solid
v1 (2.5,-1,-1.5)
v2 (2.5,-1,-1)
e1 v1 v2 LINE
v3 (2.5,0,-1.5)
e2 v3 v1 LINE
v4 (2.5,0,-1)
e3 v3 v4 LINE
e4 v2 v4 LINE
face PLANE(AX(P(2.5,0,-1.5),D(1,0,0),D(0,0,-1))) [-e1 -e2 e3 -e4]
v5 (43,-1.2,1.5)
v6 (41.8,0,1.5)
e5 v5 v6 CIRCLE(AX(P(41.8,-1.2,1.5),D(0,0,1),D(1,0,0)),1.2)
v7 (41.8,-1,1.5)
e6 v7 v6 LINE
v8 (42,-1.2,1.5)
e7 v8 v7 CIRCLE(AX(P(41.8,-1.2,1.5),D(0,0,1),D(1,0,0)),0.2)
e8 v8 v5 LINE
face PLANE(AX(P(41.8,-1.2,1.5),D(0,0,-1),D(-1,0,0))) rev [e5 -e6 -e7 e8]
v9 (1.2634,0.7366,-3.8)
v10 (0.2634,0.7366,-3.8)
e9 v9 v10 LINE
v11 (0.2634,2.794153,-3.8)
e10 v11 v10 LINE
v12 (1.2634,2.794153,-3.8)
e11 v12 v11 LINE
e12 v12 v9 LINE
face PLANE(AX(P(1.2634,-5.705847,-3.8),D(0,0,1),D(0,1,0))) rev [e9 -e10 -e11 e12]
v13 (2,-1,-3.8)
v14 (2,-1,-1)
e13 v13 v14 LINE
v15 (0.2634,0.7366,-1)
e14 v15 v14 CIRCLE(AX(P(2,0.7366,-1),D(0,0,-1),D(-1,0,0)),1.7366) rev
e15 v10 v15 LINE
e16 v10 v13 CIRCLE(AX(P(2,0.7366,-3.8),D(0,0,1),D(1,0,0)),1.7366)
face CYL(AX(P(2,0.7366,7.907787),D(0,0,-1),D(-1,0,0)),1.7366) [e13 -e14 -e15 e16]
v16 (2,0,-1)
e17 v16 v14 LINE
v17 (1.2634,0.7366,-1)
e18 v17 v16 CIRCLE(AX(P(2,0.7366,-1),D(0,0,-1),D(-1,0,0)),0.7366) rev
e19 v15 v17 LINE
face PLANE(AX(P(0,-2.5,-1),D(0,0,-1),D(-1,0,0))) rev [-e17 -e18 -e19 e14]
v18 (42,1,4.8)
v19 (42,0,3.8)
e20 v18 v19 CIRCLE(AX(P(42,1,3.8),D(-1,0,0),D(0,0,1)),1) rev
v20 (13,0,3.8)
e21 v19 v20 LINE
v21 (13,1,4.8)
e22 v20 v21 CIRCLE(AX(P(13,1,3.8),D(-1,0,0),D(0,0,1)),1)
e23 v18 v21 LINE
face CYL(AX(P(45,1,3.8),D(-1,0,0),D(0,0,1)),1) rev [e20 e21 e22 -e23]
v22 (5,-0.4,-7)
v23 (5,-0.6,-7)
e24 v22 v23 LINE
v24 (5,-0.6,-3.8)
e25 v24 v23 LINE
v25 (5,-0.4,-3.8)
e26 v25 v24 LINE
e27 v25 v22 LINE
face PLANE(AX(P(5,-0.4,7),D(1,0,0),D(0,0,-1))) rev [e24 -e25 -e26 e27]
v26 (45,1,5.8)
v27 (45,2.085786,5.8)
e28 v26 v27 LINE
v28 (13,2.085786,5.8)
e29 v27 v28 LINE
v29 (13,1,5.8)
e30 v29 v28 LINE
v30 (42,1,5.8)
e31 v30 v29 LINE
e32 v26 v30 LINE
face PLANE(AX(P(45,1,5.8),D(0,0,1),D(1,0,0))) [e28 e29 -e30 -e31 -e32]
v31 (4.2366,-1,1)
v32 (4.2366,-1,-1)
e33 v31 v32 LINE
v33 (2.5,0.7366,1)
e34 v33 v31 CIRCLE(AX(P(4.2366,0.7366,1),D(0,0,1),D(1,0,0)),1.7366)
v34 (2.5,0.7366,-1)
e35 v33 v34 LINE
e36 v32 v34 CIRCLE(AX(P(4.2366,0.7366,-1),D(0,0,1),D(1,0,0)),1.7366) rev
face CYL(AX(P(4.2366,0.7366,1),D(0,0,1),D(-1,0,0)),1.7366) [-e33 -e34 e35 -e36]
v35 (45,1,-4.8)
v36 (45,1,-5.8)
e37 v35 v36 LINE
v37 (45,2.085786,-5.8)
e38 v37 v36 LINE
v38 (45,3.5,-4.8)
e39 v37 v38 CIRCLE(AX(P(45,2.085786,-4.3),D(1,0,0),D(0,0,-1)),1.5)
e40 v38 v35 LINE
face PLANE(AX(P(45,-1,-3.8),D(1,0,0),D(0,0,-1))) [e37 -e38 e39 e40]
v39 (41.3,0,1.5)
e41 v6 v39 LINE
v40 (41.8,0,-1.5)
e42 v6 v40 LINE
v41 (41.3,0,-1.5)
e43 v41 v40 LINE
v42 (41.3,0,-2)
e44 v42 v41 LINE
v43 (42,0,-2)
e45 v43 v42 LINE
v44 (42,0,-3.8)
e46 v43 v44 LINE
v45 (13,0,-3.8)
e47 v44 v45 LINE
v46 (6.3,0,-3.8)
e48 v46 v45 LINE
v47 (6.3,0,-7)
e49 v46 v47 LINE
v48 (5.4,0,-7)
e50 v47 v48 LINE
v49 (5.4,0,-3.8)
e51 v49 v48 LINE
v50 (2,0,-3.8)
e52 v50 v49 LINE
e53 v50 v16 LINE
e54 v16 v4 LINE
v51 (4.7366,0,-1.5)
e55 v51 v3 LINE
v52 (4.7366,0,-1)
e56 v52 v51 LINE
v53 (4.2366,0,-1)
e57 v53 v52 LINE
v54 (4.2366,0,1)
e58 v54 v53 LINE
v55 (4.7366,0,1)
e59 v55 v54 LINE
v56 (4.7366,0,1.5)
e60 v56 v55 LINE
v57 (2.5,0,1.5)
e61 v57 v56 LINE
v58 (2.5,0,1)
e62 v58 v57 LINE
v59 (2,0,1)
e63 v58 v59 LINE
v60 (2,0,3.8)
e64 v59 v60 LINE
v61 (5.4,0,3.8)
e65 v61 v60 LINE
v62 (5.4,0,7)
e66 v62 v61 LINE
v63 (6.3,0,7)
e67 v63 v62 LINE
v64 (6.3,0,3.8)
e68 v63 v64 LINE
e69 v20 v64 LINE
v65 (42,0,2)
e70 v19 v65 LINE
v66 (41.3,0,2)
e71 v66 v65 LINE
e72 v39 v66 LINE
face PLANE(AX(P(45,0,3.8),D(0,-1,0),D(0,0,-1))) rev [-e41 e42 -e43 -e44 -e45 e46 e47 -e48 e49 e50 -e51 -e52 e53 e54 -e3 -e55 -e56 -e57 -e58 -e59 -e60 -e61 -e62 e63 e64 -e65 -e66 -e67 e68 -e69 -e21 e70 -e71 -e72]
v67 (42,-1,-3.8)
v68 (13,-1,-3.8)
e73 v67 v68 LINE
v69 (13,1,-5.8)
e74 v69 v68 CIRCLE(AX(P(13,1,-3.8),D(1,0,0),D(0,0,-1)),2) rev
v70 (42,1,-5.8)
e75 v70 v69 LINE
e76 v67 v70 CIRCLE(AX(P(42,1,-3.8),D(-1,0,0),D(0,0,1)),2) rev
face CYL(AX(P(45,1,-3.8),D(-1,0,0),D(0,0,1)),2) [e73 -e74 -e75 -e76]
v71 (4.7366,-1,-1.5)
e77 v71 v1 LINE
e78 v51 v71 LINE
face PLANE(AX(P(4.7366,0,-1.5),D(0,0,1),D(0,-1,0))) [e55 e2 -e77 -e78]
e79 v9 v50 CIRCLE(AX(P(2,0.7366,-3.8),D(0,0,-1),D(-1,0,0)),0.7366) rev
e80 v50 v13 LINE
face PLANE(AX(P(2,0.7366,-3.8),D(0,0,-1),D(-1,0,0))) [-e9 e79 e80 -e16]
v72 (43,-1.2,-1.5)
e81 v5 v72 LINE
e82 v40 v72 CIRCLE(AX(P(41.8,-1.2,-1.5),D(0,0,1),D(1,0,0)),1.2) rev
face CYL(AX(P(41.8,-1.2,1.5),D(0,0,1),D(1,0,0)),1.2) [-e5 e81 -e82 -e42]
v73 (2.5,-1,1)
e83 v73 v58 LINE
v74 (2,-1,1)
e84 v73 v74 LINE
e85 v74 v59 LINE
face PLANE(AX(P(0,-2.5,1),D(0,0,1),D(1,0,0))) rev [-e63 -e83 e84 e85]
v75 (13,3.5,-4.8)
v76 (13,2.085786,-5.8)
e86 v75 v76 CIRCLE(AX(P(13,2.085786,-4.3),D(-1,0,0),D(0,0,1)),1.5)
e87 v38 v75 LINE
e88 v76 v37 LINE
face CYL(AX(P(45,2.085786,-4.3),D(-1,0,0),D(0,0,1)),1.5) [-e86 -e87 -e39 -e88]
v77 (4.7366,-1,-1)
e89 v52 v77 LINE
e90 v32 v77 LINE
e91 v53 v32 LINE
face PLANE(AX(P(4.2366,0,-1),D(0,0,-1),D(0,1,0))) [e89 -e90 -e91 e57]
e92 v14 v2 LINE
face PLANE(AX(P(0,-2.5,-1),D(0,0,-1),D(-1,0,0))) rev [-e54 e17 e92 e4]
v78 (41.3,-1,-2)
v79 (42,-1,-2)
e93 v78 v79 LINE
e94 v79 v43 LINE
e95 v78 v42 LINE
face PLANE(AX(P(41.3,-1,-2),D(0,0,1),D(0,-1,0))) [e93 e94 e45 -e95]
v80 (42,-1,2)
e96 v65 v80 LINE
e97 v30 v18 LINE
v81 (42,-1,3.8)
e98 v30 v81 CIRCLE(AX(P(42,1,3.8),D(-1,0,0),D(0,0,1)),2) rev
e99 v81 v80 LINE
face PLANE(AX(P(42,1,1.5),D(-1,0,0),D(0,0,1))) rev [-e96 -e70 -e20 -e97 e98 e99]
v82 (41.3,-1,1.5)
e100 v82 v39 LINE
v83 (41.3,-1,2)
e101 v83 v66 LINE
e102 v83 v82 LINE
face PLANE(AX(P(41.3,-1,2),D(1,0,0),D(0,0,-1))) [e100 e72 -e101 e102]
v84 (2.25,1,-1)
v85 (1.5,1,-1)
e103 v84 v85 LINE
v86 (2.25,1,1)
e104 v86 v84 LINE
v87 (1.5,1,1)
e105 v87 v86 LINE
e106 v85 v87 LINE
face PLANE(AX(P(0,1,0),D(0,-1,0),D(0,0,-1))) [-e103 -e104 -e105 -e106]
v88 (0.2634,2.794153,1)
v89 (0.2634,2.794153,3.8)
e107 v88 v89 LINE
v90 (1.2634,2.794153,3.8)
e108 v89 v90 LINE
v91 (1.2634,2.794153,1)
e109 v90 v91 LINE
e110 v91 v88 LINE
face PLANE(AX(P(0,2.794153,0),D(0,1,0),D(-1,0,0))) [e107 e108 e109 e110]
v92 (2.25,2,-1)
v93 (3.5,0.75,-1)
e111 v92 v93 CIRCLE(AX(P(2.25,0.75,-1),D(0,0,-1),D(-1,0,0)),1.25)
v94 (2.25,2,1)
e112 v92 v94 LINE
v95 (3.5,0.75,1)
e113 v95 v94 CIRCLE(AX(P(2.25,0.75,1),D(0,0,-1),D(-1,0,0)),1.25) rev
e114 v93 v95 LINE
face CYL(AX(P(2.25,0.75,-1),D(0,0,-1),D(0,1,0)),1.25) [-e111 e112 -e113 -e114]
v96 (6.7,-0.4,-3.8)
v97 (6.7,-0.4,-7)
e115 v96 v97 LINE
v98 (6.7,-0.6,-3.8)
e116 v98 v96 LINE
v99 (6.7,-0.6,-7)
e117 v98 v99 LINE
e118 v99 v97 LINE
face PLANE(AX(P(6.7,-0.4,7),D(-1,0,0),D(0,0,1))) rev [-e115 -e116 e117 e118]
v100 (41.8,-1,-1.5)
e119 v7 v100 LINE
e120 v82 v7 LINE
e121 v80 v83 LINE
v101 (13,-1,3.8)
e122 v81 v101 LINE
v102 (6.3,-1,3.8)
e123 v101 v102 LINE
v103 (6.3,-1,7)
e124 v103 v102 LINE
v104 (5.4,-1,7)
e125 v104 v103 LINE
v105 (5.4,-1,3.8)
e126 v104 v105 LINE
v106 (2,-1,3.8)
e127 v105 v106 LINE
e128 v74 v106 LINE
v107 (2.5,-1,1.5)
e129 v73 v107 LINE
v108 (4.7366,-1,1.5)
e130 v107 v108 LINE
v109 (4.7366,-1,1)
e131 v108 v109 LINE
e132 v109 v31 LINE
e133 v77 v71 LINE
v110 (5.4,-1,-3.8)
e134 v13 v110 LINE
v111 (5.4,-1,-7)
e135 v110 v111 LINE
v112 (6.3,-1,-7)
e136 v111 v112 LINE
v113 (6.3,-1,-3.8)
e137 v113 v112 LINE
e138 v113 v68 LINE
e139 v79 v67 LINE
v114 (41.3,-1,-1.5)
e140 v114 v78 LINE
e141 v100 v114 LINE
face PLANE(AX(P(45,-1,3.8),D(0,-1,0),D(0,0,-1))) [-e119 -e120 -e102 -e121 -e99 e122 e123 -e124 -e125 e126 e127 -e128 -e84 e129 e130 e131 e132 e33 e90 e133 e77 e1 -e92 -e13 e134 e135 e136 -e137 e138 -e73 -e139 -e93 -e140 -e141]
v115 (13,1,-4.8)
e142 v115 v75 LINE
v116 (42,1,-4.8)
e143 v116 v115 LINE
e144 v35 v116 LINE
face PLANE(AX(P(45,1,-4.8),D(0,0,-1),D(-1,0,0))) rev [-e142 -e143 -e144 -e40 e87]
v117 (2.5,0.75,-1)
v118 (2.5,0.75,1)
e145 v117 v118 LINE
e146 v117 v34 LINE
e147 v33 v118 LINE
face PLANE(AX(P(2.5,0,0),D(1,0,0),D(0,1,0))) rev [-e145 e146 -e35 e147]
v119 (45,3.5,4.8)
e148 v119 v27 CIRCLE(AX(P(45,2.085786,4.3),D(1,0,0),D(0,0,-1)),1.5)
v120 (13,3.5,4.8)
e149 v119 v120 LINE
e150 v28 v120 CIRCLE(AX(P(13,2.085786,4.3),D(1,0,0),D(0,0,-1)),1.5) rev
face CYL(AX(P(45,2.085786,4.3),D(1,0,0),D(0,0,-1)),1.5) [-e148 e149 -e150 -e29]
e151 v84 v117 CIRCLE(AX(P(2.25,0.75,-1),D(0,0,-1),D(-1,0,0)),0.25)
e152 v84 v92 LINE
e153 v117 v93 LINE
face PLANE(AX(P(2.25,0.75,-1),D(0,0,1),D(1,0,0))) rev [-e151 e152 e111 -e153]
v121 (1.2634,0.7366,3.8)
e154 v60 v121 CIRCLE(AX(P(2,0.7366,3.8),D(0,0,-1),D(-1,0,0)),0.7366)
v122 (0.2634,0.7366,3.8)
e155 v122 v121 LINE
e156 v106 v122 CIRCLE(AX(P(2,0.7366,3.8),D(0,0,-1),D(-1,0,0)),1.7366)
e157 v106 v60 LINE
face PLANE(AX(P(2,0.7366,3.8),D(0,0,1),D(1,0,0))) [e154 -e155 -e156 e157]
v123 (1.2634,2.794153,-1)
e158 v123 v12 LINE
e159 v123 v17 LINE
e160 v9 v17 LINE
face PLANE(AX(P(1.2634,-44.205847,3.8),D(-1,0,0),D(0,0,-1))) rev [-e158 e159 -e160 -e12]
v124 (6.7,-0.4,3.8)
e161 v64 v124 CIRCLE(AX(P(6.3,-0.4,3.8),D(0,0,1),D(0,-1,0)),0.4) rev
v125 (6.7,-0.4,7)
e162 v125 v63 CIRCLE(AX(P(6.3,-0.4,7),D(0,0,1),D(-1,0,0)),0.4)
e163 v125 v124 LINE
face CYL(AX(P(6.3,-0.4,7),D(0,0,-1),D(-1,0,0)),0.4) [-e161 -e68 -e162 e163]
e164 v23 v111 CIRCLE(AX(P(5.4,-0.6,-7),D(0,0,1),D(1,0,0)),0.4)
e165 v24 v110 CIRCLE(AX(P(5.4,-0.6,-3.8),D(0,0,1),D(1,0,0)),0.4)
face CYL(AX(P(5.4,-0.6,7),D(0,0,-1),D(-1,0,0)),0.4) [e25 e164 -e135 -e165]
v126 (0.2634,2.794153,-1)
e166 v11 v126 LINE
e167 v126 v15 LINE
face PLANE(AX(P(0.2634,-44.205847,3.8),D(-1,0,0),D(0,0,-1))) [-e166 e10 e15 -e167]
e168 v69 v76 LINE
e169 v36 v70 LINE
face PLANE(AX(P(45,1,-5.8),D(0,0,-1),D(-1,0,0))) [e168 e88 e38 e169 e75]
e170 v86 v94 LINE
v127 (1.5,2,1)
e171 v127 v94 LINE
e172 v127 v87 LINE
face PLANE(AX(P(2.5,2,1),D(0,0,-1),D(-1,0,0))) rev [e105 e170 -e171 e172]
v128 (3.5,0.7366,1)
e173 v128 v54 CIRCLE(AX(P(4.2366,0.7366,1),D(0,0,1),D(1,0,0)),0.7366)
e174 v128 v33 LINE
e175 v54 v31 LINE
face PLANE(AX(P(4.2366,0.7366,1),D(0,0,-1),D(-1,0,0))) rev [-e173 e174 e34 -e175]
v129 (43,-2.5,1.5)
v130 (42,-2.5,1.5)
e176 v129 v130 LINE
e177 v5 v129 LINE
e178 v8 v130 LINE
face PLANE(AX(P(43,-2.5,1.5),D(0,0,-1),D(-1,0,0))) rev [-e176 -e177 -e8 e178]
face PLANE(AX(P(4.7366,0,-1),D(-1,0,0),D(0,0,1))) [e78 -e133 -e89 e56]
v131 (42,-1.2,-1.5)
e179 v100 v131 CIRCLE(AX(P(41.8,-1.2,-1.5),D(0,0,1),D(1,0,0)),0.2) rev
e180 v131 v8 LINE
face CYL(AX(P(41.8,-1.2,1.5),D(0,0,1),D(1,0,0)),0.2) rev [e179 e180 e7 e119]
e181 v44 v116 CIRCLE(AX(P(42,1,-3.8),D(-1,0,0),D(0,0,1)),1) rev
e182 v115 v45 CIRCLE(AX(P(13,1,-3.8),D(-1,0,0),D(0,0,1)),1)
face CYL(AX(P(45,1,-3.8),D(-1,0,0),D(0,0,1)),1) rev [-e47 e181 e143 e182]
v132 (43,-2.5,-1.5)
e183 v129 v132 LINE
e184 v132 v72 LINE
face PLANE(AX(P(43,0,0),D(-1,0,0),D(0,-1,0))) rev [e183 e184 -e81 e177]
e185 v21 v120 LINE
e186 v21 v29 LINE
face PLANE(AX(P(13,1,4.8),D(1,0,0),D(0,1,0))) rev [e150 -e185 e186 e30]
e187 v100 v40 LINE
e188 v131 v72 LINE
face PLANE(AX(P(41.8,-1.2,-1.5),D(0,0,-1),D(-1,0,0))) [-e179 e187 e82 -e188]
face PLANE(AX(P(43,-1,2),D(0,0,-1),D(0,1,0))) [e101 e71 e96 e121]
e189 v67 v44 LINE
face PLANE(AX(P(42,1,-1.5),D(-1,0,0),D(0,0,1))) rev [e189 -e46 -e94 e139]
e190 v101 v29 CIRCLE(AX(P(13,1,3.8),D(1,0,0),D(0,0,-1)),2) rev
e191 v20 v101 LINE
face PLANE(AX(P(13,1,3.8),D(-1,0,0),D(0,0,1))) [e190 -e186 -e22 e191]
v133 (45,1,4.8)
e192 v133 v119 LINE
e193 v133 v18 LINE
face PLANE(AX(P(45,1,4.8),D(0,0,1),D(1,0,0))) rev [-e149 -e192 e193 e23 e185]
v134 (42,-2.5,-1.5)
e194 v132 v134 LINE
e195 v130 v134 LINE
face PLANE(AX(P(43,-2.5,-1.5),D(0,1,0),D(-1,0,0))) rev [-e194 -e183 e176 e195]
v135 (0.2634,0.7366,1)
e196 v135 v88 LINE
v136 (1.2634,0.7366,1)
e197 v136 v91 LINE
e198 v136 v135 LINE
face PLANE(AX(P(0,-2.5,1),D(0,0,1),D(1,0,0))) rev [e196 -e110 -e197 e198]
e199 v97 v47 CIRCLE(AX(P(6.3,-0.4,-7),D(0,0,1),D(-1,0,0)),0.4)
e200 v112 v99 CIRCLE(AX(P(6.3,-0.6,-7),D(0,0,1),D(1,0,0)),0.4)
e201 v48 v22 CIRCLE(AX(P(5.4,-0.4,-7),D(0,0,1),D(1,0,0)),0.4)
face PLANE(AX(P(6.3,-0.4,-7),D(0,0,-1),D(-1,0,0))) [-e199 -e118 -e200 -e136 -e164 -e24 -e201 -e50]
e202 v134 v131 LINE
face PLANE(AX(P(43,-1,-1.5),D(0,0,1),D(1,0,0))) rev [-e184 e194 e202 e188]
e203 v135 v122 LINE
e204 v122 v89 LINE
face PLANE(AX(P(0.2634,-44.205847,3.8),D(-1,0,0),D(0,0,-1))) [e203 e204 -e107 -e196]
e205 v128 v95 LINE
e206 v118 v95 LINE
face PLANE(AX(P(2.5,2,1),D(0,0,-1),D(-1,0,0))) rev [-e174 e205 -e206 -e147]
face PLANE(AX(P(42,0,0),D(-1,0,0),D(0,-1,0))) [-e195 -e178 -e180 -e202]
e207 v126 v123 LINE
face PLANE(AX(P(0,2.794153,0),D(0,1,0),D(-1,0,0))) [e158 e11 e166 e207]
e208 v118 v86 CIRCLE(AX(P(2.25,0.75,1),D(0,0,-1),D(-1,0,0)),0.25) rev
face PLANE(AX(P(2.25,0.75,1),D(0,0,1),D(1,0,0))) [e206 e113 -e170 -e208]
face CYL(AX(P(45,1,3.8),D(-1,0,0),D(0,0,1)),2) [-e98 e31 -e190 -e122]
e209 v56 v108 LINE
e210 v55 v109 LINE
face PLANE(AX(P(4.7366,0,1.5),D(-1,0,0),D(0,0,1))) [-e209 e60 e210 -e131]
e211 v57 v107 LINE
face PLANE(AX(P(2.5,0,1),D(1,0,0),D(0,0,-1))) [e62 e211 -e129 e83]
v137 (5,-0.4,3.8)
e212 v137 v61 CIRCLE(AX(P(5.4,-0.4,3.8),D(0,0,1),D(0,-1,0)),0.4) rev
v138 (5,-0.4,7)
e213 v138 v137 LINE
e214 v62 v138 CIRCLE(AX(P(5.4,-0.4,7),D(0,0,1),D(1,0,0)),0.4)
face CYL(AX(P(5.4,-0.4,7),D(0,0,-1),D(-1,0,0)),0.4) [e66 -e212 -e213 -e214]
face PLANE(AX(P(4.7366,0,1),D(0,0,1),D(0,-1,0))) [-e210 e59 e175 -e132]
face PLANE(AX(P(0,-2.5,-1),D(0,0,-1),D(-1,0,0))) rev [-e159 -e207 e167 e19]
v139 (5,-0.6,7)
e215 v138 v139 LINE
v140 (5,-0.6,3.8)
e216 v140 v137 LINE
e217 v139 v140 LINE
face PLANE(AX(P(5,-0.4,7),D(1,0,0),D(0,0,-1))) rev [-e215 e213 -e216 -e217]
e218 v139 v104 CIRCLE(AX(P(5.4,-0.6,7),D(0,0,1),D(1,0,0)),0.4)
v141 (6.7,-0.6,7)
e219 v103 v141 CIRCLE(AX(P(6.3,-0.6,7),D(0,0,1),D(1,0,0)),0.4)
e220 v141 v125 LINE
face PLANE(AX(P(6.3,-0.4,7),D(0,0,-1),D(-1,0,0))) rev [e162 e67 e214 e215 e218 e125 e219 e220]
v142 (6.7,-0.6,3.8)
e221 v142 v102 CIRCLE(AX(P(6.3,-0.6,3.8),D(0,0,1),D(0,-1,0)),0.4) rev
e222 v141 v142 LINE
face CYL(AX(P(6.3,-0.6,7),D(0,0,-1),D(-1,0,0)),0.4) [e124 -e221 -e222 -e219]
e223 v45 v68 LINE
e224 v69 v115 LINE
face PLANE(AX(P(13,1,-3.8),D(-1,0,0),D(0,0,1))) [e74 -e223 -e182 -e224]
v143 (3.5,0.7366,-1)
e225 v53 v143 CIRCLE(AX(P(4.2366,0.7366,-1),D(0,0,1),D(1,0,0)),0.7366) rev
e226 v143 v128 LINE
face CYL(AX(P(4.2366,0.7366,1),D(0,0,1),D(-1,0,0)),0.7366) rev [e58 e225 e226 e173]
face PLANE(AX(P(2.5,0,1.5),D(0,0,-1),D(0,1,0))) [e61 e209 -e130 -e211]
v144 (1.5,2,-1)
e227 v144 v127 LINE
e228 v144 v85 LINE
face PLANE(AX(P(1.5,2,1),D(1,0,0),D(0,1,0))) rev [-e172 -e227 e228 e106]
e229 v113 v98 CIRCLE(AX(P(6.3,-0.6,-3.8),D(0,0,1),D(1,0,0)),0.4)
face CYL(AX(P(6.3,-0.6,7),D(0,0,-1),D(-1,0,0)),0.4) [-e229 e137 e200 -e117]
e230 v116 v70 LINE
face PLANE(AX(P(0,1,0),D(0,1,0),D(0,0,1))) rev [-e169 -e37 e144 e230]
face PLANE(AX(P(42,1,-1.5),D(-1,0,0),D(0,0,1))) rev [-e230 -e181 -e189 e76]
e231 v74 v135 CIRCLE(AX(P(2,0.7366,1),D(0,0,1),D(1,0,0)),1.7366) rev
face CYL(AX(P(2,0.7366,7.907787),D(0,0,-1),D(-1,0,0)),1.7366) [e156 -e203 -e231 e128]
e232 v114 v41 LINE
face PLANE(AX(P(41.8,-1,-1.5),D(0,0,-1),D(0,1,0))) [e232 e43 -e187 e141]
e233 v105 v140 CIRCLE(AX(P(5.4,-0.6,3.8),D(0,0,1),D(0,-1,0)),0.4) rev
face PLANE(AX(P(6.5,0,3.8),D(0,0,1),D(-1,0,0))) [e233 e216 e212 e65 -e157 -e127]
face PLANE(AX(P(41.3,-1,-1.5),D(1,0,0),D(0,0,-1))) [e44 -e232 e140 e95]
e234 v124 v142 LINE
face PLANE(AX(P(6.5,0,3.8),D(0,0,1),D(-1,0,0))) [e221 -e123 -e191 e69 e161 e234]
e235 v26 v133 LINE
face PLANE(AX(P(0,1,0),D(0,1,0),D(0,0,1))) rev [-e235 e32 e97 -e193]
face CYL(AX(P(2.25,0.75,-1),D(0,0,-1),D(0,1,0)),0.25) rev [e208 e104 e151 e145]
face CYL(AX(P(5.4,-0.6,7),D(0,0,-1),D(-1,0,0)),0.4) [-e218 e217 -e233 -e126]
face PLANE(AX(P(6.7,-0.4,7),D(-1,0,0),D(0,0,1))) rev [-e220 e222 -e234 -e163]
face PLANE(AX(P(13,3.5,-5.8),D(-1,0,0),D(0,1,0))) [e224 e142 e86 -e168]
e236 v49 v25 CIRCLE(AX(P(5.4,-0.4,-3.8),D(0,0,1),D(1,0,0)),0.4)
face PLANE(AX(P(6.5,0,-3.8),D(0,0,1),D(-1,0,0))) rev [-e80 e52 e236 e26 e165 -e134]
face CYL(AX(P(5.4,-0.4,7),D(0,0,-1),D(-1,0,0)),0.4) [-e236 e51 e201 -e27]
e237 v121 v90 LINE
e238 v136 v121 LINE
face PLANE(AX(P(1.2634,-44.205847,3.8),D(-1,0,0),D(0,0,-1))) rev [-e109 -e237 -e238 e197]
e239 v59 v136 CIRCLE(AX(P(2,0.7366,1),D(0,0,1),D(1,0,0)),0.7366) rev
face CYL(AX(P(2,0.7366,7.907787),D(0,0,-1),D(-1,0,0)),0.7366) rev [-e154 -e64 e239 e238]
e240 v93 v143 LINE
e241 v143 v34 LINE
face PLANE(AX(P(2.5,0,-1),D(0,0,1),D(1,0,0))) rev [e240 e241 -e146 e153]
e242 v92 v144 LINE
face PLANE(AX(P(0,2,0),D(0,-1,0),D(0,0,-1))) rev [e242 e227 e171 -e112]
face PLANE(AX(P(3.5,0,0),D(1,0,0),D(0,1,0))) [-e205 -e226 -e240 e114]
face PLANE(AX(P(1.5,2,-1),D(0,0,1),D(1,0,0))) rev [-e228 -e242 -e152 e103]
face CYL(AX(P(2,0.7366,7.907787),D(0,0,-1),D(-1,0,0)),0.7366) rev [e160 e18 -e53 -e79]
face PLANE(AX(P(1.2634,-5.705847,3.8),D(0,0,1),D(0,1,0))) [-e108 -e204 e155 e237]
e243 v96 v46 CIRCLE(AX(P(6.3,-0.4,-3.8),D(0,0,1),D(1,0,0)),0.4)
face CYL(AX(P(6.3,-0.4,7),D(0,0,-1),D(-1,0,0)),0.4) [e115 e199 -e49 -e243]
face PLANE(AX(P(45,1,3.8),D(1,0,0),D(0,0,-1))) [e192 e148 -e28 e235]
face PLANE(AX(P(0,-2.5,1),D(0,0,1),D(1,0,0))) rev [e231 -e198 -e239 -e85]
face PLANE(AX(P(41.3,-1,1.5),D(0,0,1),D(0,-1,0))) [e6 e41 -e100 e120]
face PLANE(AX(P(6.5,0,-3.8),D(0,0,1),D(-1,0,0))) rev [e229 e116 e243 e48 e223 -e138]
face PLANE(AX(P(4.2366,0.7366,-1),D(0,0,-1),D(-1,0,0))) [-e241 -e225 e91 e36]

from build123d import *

# Parameters (mm, degrees)
BASE_FLANGE2_DEPTH              = 45
FRONT_CUT_DEPTH                 = 2
FRONT_STRIP_W                   = 4.4
FRONT_STRIP_H                   = 1
FRONT_STRIP_CUT_DEPTH           = 3
FRONT_RELIEF_W                  = 4.9
FRONT_RELIEF_H                  = 0.5
FRONT_RELIEF_CUT_DEPTH          = 1
FRONT_DEPTH                     = 3
BACK_CUT_DEPTH                  = 13
GUIDING_PINS_DEPTH              = 7
FILLET3_R                       = 1.5
BACK_START                      = -3.8
BACK_2_BENDS_DEPTH              = 7.6
BACK_2_BENDS_2_DEPTH            = 7.6
MIDDLE_CUT_DEPTH                = 46.675485766
MIDDLE_CUT_DEPTH_BACK           = 46.675485766
SKETCH32_W                      = 2.5
SKETCH32_H                      = 2
MIDDLE_START                    = -1.5
MIDDLE_SPRING_1_DEPTH           = 3
MIDDLE_SPRING_1_2_DEPTH         = 0.5
MIDDLE_START_2                  = 1
MIDDLE_SPRING_1_3_DEPTH         = 0.5
MIDDLE_START_3                  = -1
MIDDLE_SPRING_1_4_DEPTH         = 2
MIDDLE_SPRING_2_STRIP_W         = 4.5
MIDDLE_SPRING_2_STRIP_H         = 1
MIDDLE_SPRING_2_STRIP_CUT_DEPTH = 2
MIDDLE_SPRING_2_DEPTH           = 2
SKETCH50_W                      = 1
SKETCH50_H                      = 2.8
BACK_2_BENDS_EXTENSION_DEPTH    = 2


# Read off the part's stored shape, not the designer's step: back cut, back 2 bends, middle spring 1
# Sheet-metal steps are written as plain solids
with BuildPart() as part:
    # Sketch6 → Base-Flange2 (new body)
    with BuildSketch(Plane(origin=(0, 0, 0), x_dir=(0, 0, -1), z_dir=(1, 0, 0))):
        with BuildLine():
            Line((-4.8, 3.5), (-4.8, 1))
            ThreePointArc((-4.8, 1), (-4.507106781, 0.292893219), (-3.8, 0))
            Line((-3.8, 0), (3.8, 0))
            ThreePointArc((3.8, 0), (4.507106781, 0.292893219), (4.8, 1))
            Line((4.8, 1), (4.8, 3.5))
            Line((4.8, 3.5), (5.8, 3.5))
            Line((5.8, 3.5), (5.8, 1))
            ThreePointArc((5.8, 1), (5.214213562, -0.414213562), (3.8, -1))
            Line((3.8, -1), (-3.8, -1))
            ThreePointArc((-3.8, -1), (-5.214213562, -0.414213562), (-5.8, 1))
            Line((-5.8, 1), (-5.8, 3.5))
            Line((-5.8, 3.5), (-4.8, 3.5))
        make_face()
    extrude(amount=BASE_FLANGE2_DEPTH)

    # Sketch51 → front cut (cut)
    with BuildSketch(Plane.XZ.offset(1)):
        Polygon((42, 1.5), (43, 1.5), (43, -1.5), (42, -1.5), (42, -6), (46, -6), (46, -1.5), (45, -1.5), (45, 1.5), (46, 1.5), (46, 6), (42, 6), align=None)
    extrude(amount=-FRONT_CUT_DEPTH, mode=Mode.SUBTRACT)

    # front strip (across the edge) → front strip cut (cut)
    with BuildSketch(Plane(origin=(43, -1, -1.5), x_dir=(-1, 0, 0), z_dir=(0, 0, 1))):
        with Locations((-1, -0.5)):
            Rectangle(FRONT_STRIP_W, FRONT_STRIP_H)
    extrude(amount=FRONT_STRIP_CUT_DEPTH, mode=Mode.SUBTRACT)

    # front relief (on the sheet) → front relief cut (cut)
    with BuildSketch(Plane(origin=(41.8, -1, -1.5), x_dir=(-1, 0, 0), z_dir=(0, -1, 0))):
        with Locations((-1.95, 0.25)):
            Rectangle(FRONT_RELIEF_W, FRONT_RELIEF_H)
        with Locations((-1.95, -3.25)):
            Rectangle(FRONT_RELIEF_W, FRONT_RELIEF_H)
    extrude(amount=-FRONT_RELIEF_CUT_DEPTH, mode=Mode.SUBTRACT)

    # front section (across the edge) → front (add)
    with BuildSketch(Plane(origin=(43, -1, -1.5), x_dir=(-1, 0, 0), z_dir=(0, 0, 1))):
        with BuildLine():
            Line((0, 0.2), (0, 1.5))
            Line((0, 1.5), (1, 1.5))
            Line((1, 1.5), (1, 0.2))
            ThreePointArc((1, 0.2), (1.058578644, 0.058578644), (1.2, 0))
            Line((1.2, 0), (1.2, -1))
            ThreePointArc((1.2, -1), (0.351471863, -0.648528137), (0, 0.2))
        make_face()
    extrude(amount=FRONT_DEPTH)

    # back cut outline → back cut (cut)
    with BuildSketch(Plane.YZ):
        with BuildLine():
            Line((-1, 3.8), (0, 3.8))
            ThreePointArc((0, 3.8), (0.292893219, 4.507106781), (1, 4.8))
            Line((1, 4.8), (3.5, 4.8))
            Line((3.5, 4.8), (3.5, 5.8))
            Line((3.5, 5.8), (1, 5.8))
            ThreePointArc((1, 5.8), (-0.414213562, 5.214213562), (-1, 3.8))
        make_face()
        with BuildLine():
            ThreePointArc((1, -4.8), (0.292893219, -4.507106781), (0, -3.8))
            Line((0, -3.8), (-1, -3.8))
            ThreePointArc((-1, -3.8), (-0.414213562, -5.214213562), (1, -5.8))
            Line((1, -5.8), (3.5, -5.8))
            Line((3.5, -5.8), (3.5, -4.8))
            Line((3.5, -4.8), (1, -4.8))
        make_face()
    extrude(amount=BACK_CUT_DEPTH, mode=Mode.SUBTRACT)

    # Sketch27 → guiding pins (add, symmetric)
    with BuildSketch(Plane.XY):
        with BuildLine():
            Line((5.4, 0), (6.3, 0))
            ThreePointArc((6.3, 0), (6.582842712, -0.117157288), (6.7, -0.4))
            Line((6.7, -0.4), (6.7, -0.6))
            ThreePointArc((6.7, -0.6), (6.582842712, -0.882842712), (6.3, -1))
            Line((6.3, -1), (5.4, -1))
            ThreePointArc((5.4, -1), (5.117157288, -0.882842712), (5, -0.6))
            Line((5, -0.6), (5, -0.4))
            ThreePointArc((5, -0.4), (5.117157288, -0.117157288), (5.4, 0))
        make_face()
    extrude(amount=GUIDING_PINS_DEPTH, both=True)

    # Fillet3
    # the kernel refuses this fillet: 1.5 mm, written as the material it takes off along each edge
    with BuildSketch(Plane(origin=(9.464466094, 3.5, 5.8), x_dir=(0, -1, 0), z_dir=(1, 0, 0))) as fillet3_piece_1:
        with BuildLine():
            CenterArc((1.414213562, 1.5), FILLET3_R, 199.471220634, 70.528779366)
            Line((0, 1), (-0.028284271, 0.99))
            ThreePointArc((-0.028284271, 0.99), (-0.03, 0.5), (-0.03, 0))
            Line((-0.03, 0), (0, -0.03))
            Line((0, -0.03), (1.414213562, -0.03))
            Line((1.414213562, -0.03), (1.414213562, 0))
        make_face()
    extrude(amount=39.071067812, mode=Mode.SUBTRACT)
    with BuildSketch(Plane(origin=(9.464466094, 3.5, -5.8), x_dir=(0, -1, 0), z_dir=(1, 0, 0))) as fillet3_piece_2:
        with BuildLine():
            CenterArc((1.414213562, -1.5), FILLET3_R, 90, 70.528779366)
            Line((0, -1), (-0.028284271, -0.99))
            ThreePointArc((-0.028284271, -0.99), (-0.03, -0.5), (-0.03, 0))
            Line((-0.03, 0), (0, 0.03))
            Line((0, 0.03), (1.414213562, 0.03))
            Line((1.414213562, 0.03), (1.414213562, 0))
        make_face()
    extrude(amount=39.071067812, mode=Mode.SUBTRACT)

    # back 2 bends outline → back 2 bends (cut)
    with BuildSketch(Plane.XY.offset(BACK_START)):
        with BuildLine():
            Line((0, -1), (2, -1))
            ThreePointArc((2, -1), (1.068173836, -0.728828115), (0.42735891, 0))
            Line((0.42735891, 0), (0, 0))
            Line((0, 0), (0, -1))
        make_face()
    extrude(amount=BACK_2_BENDS_DEPTH, mode=Mode.SUBTRACT)

    # back 2 bends 2 outline → back 2 bends 2 (add)
    with BuildSketch(Plane.XY.offset(BACK_START)):
        with BuildLine():
            ThreePointArc((0.2634, 0.7366), (0.304885243, 0.359286442), (0.42735891, 0))
            Line((0.42735891, 0), (2, 0))
            ThreePointArc((2, 0), (1.479145145, 0.215745145), (1.2634, 0.7366))
            Line((1.2634, 0.7366), (1.2634, 0.794153262))
            Line((1.2634, 0.794153262), (0.2634, 0.794153262))
            Line((0.2634, 0.794153262), (0.2634, 0.7366))
        make_face()
    extrude(amount=BACK_2_BENDS_2_DEPTH)

    # Sketch32 → middle cut (cut, two sides: drawn at the far end of the back side and taken through both)
    with BuildSketch(Plane(origin=(0, 0, 0), x_dir=(1, 0, 0), z_dir=(0, 1, 0)).offset(-MIDDLE_CUT_DEPTH_BACK)):
        with Locations((1.25, 0)):
            Rectangle(SKETCH32_W, SKETCH32_H)
    extrude(amount=MIDDLE_CUT_DEPTH + MIDDLE_CUT_DEPTH_BACK, mode=Mode.SUBTRACT)

    # middle spring 1 outline → middle spring 1 (cut)
    with BuildSketch(Plane.XY.offset(MIDDLE_START)):
        with BuildLine():
            Line((2.5, 0), (2.5, -1))
            Line((2.5, -1), (4.2366, -1))
            ThreePointArc((4.2366, -1), (3.304773836, -0.728828115), (2.66395891, 0))
            Line((2.66395891, 0), (2.5, 0))
        make_face()
    extrude(amount=MIDDLE_SPRING_1_DEPTH, mode=Mode.SUBTRACT)

    # middle spring 1 2 outline → middle spring 1 2 (cut)
    with BuildSketch(Plane.XY.offset(MIDDLE_START)):
        with BuildLine():
            ThreePointArc((2.66395891, 0), (3.304773836, -0.728828115), (4.2366, -1))
            Line((4.2366, -1), (4.7366, -1))
            Line((4.7366, -1), (4.7366, 0))
            Line((4.7366, 0), (2.66395891, 0))
        make_face()
    extrude(amount=MIDDLE_SPRING_1_2_DEPTH, mode=Mode.SUBTRACT)

    # middle spring 1 3 outline → middle spring 1 3 (cut)
    with BuildSketch(Plane.XY.offset(MIDDLE_START_2)):
        with BuildLine():
            ThreePointArc((2.66395891, 0), (3.304773836, -0.728828115), (4.2366, -1))
            Line((4.2366, -1), (4.7366, -1))
            Line((4.7366, -1), (4.7366, 0))
            Line((4.7366, 0), (2.66395891, 0))
        make_face()
    extrude(amount=MIDDLE_SPRING_1_3_DEPTH, mode=Mode.SUBTRACT)

    # middle spring 1 4 outline → middle spring 1 4 (add)
    with BuildSketch(Plane.XY.offset(MIDDLE_START_3)):
        with BuildLine():
            ThreePointArc((2.5, 0.7366), (2.541485243, 0.359286442), (2.66395891, 0))
            Line((2.66395891, 0), (4.2366, 0))
            ThreePointArc((4.2366, 0), (3.715745145, 0.215745145), (3.5, 0.7366))
            Line((3.5, 0.7366), (3.5, 2))
            Line((3.5, 2), (2.5, 2))
            Line((2.5, 2), (2.5, 0.7366))
        make_face()
    extrude(amount=MIDDLE_SPRING_1_4_DEPTH)

    # middle spring 2 strip (across the edge) → middle spring 2 strip cut (cut)
    with BuildSketch(Plane(origin=(2.5, 2, 1), x_dir=(0, -1, 0), z_dir=(0, 0, -1))):
        with Locations((-1, -0.5)):
            Rectangle(MIDDLE_SPRING_2_STRIP_W, MIDDLE_SPRING_2_STRIP_H)
    extrude(amount=MIDDLE_SPRING_2_STRIP_CUT_DEPTH, mode=Mode.SUBTRACT)

    # middle spring 2 section (across the edge) → middle spring 2 (add)
    with BuildSketch(Plane(origin=(2.5, 2, 1), x_dir=(0, -1, 0), z_dir=(0, 0, -1))):
        with BuildLine():
            Line((0, 0.25), (0, 1))
            Line((0, 1), (1, 1))
            Line((1, 1), (1, 0.25))
            ThreePointArc((1, 0.25), (1.073223305, 0.073223305), (1.25, 0))
            Line((1.25, 0), (1.25, -1))
            ThreePointArc((1.25, -1), (0.366116524, -0.633883476), (0, 0.25))
        make_face()
    extrude(amount=MIDDLE_SPRING_2_DEPTH)

    # Sketch50 → back 2 bends extension (add)
    with BuildSketch(Plane(origin=(0, 0.794153262, 0), x_dir=(1, 0, 0), z_dir=(0, 1, 0))):
        with Locations((0.7634, -2.4)):
            Rectangle(SKETCH50_W, SKETCH50_H)
        with Locations((0.7634, 2.4)):
            Rectangle(SKETCH50_W, SKETCH50_H)
    extrude(amount=BACK_2_BENDS_EXTENSION_DEPTH)


solid = part.part
